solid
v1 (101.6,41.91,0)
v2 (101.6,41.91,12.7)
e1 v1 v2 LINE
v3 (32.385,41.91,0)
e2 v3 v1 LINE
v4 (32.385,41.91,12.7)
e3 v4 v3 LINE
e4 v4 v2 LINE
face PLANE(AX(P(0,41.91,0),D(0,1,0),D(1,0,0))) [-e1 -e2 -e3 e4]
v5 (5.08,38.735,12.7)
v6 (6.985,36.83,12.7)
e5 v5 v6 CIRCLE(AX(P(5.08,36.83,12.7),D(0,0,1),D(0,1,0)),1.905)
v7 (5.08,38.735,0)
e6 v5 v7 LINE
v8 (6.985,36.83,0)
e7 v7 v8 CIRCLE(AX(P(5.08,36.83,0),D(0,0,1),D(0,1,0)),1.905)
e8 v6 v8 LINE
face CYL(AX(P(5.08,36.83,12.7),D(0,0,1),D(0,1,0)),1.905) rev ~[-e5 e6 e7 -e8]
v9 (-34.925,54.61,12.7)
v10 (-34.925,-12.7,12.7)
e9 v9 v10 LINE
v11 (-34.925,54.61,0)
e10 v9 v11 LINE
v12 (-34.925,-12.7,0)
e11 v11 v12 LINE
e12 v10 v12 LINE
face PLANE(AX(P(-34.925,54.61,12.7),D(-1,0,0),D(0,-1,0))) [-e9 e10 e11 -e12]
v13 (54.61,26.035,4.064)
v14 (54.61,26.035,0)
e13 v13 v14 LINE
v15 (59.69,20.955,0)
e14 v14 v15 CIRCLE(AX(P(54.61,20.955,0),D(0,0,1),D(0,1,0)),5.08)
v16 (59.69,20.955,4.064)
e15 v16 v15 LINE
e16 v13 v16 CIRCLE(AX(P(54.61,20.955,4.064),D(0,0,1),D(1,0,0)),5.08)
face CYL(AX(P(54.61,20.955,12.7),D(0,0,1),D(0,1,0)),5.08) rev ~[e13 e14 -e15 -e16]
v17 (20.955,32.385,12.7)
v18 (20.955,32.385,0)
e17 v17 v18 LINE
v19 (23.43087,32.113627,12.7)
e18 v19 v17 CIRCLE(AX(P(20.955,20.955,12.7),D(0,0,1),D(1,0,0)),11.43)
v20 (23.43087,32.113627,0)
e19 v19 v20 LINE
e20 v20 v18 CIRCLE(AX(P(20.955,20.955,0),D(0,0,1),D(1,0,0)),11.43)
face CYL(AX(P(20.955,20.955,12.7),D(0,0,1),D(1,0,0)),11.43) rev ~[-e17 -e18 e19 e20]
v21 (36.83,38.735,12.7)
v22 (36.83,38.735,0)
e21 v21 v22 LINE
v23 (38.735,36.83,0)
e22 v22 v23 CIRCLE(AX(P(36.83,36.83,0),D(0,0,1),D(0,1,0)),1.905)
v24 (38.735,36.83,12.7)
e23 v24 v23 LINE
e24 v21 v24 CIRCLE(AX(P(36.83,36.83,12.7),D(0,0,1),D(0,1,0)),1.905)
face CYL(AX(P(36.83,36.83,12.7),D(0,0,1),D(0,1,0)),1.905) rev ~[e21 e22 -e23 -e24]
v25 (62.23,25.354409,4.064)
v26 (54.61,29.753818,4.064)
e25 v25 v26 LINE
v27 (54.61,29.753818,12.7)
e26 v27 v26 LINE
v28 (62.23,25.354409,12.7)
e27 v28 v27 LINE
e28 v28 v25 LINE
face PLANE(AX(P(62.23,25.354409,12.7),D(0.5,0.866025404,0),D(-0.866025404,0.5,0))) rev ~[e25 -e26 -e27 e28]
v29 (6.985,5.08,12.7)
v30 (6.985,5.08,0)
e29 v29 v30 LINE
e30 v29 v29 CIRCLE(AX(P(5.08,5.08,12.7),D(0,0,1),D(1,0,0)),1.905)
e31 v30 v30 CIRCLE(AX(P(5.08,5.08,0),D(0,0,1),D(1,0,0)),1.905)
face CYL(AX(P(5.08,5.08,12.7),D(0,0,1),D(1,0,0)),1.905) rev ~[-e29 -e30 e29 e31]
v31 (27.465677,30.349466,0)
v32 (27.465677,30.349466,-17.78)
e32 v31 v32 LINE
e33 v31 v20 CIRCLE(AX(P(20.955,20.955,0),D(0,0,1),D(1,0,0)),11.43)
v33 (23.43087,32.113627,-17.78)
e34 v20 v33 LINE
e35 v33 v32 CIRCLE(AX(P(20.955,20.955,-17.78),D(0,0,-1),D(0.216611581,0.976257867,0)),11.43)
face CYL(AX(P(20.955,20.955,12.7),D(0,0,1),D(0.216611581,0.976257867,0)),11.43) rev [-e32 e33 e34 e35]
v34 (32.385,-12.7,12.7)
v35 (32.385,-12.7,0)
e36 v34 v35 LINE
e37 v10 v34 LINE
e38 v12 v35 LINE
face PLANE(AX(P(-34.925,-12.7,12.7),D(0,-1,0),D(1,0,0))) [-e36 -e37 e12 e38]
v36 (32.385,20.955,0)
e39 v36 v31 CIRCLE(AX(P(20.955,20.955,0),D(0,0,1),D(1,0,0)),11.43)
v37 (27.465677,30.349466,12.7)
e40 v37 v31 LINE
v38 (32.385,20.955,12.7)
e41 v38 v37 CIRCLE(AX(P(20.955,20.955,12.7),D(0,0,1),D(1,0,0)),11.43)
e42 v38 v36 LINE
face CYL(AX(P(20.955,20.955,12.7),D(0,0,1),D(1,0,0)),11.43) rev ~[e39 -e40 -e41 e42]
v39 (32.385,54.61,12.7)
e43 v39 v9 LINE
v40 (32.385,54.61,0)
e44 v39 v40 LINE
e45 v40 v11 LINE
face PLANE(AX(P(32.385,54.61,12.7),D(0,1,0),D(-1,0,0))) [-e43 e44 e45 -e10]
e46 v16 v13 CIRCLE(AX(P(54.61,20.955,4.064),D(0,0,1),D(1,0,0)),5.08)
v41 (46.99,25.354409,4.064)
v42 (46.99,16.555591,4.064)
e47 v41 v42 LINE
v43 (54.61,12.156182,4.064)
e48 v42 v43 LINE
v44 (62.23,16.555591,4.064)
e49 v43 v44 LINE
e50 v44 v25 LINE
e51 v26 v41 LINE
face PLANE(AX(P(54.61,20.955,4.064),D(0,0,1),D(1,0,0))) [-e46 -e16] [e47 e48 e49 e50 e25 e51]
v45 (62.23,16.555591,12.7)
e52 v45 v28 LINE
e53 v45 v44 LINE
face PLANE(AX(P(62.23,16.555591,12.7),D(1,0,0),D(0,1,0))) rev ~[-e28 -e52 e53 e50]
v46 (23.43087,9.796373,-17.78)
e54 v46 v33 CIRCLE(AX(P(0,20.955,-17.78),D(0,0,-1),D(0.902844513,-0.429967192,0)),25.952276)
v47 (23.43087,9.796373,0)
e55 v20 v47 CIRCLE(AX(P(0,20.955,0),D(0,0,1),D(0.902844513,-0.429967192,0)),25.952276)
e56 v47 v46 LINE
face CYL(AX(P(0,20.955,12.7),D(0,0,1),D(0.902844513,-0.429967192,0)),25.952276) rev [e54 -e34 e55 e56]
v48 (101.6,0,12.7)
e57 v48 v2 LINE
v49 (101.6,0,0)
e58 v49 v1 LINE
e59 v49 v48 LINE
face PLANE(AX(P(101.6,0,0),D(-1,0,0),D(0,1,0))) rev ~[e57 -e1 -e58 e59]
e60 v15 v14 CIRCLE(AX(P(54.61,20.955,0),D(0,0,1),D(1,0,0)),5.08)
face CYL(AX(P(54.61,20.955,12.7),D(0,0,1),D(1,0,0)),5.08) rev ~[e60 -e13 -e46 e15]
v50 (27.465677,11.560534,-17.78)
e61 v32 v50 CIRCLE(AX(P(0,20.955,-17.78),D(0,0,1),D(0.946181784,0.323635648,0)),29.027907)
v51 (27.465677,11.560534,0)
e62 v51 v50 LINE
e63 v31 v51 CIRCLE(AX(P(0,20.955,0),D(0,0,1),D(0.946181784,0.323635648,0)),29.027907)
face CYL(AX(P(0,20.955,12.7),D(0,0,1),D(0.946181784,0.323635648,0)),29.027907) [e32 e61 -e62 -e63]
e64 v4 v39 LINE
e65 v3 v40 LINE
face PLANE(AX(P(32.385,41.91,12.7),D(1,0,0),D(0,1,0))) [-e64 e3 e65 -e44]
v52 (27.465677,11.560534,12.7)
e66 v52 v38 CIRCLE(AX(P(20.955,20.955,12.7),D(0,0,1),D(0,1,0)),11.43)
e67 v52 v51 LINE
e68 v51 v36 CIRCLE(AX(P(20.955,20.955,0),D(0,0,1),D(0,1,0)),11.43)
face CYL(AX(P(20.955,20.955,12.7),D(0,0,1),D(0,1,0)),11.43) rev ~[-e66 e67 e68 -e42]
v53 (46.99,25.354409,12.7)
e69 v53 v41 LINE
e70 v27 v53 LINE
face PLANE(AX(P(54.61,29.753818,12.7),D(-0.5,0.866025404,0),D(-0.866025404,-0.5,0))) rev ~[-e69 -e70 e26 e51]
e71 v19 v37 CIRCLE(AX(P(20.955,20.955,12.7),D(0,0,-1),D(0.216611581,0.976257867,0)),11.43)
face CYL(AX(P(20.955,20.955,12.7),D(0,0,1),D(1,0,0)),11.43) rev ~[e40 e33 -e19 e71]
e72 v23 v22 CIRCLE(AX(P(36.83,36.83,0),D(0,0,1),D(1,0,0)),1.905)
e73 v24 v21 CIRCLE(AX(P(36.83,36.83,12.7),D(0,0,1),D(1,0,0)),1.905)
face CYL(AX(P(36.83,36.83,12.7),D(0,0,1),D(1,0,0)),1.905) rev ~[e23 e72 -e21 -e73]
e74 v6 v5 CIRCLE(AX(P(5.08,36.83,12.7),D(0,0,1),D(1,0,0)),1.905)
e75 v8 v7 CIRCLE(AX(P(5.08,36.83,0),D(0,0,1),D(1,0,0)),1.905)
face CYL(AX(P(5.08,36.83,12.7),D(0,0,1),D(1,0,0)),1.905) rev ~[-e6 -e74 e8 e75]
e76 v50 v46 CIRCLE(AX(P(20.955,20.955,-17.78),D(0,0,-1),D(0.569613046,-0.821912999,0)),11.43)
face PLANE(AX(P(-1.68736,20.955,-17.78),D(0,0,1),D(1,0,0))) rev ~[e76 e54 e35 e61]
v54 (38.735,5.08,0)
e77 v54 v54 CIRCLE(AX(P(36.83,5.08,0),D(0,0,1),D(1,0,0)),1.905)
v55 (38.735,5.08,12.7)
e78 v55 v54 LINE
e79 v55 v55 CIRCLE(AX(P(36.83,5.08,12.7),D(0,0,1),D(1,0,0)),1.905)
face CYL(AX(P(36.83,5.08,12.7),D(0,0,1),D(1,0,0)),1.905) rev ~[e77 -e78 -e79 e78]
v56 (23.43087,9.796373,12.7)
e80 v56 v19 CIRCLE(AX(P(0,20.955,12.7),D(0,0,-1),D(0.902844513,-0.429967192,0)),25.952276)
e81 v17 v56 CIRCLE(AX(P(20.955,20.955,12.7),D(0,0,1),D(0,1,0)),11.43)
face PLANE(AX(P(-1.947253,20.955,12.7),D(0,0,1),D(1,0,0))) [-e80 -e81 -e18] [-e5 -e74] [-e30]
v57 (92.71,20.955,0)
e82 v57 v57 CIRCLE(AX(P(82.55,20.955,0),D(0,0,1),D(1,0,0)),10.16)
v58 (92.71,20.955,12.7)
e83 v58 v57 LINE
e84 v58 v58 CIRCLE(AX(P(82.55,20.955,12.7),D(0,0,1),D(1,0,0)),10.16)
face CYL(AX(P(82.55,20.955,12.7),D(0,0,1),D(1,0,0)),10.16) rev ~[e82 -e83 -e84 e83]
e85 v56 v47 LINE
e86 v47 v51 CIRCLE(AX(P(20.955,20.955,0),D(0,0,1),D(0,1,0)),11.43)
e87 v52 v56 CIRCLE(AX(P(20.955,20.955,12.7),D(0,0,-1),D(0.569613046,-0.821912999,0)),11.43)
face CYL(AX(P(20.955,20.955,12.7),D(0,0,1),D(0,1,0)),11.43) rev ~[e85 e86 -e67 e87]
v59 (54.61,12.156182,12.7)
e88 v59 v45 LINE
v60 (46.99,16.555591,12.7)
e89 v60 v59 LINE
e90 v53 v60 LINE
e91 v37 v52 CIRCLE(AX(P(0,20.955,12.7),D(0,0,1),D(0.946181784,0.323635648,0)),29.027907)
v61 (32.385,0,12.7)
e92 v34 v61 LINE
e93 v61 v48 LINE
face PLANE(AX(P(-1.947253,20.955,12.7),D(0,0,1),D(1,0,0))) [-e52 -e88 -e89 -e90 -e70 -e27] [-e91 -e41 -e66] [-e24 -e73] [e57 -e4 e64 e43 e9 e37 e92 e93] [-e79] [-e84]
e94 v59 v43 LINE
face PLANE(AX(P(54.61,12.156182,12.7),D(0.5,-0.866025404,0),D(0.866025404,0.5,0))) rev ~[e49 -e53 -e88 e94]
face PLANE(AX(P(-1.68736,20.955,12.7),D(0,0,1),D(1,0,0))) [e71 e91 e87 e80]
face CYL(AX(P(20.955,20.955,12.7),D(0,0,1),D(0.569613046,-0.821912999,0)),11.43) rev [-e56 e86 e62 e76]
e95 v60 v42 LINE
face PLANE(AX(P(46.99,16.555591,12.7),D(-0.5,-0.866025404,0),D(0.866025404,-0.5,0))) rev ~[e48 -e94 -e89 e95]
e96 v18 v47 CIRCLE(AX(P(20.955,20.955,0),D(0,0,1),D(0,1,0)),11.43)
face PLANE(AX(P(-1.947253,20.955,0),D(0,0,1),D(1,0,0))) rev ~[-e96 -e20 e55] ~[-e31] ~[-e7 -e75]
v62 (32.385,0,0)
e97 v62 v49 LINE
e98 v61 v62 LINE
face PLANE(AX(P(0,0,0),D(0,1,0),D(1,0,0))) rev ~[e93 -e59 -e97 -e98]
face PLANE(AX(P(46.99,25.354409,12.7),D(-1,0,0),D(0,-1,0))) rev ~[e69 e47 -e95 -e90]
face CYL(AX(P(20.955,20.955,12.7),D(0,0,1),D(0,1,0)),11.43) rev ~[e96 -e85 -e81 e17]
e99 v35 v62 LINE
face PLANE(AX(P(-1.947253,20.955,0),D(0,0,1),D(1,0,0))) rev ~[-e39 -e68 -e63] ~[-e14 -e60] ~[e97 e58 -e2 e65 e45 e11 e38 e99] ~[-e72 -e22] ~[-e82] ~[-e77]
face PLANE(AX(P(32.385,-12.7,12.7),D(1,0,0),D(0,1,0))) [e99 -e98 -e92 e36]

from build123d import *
from build123d import SkipClean  # not in build123d's __all__

# Parameters (mm, degrees)
F0_W      = 101.6
F0_H      = 41.91
F1_DEPTH  = 12.7
F4_DEPTH  = 12.701
F5_R      = 5.08
F6_DEPTH  = 8.636
F7_R      = 10.16
F8_DEPTH  = 12.701
F10_DEPTH = 12.701
F2_R      = 1.905
F12_DEPTH = 25.4
F13_DEPTH = 12.7
F15_DEPTH = 30.48


with BuildPart() as f1:
    # F0 (on Top) → F1 (new body)
    with BuildSketch(Plane.XY):
        with Locations((50.8, 20.955)):
            Rectangle(F0_W, F0_H)
    extrude(amount=F1_DEPTH)

    # F3 (on face) → F4 (cut, through all)
    with BuildSketch(Plane.XY.offset(12.7)):
        with BuildLine():
            ThreePointArc((59.69, 20.955), (58.2021024484, 24.5471024484), (54.61, 26.035))
            ThreePointArc((54.61, 26.035), (51.0178975516, 17.3628975516), (59.69, 20.955))
        make_face()
    extrude(amount=-F4_DEPTH, mode=Mode.SUBTRACT)

    # F5 (on face) → F6 (cut)
    with BuildSketch(Plane.XY.offset(12.7)):
        Polygon((62.23, 16.5555909488), (62.23, 20.955), (62.23, 25.3544090512), (54.61, 29.7538181024), (46.99, 25.3544090512), (46.99, 16.5555909488), (54.61, 12.1561818976), align=None)
        with Locations((54.61, 20.955)):
            Circle(F5_R, mode=Mode.SUBTRACT)
    extrude(amount=-F6_DEPTH, mode=Mode.SUBTRACT)

    # F7 (on face) → F8 (cut, through all)
    with BuildSketch(Plane.XY.offset(12.7)):
        with Locations((82.55, 20.955)):
            Circle(F7_R)
    extrude(amount=-F8_DEPTH, mode=Mode.SUBTRACT)

    # F9 (on face) → F10 (cut, through all)
    with BuildSketch(Plane.XY.offset(12.7)):
        with BuildLine():
            ThreePointArc((20.955, 32.385), (12.872769491, 12.872769491), (32.385, 20.955))
            ThreePointArc((32.385, 20.955), (29.037230509, 29.037230509), (20.955, 32.385))
        make_face()
    extrude(amount=-F10_DEPTH, mode=Mode.SUBTRACT)

    # F2 (on face) → F12 (cut)
    with BuildSketch(Plane.XY.offset(12.7)):
        with BuildLine():
            ThreePointArc((38.735, 36.83), (38.1770384182, 38.1770384182), (36.83, 38.735))
            ThreePointArc((36.83, 38.735), (35.4829615818, 35.4829615818), (38.735, 36.83))
        make_face()
        with Locations((5.08, 5.08)):
            Circle(F2_R)
        with BuildLine():
            ThreePointArc((6.985, 36.83), (6.4270384182, 38.1770384182), (5.08, 38.735))
            ThreePointArc((5.08, 38.735), (3.7329615818, 35.4829615818), (6.985, 36.83))
        make_face()
        with Locations((36.83, 5.08)):
            Circle(F2_R)
    extrude(amount=-F12_DEPTH, mode=Mode.SUBTRACT)

    # F11 (on face) → F13 (join)
    with BuildSketch(Plane.XY.offset(12.7)):
        Polygon((32.385, -12.7), (32.385, 0), (0, 0), (0, 41.91), (32.385, 41.91), (32.385, 54.61), (-34.925, 54.61), (-34.925, -12.7), align=None)
    extrude(amount=-F13_DEPTH)

    # F14 (on face) → F15 (join)
    with BuildSketch(Plane.XY.offset(12.7)):
        with BuildLine():
            ThreePointArc((23.4308703665, 32.1136274213), (25.5340365405, 31.4276942265), (27.4656771106, 30.3494655815))
            ThreePointArc((27.4656771106, 30.3494655815), (-29.0279073084, 20.955), (27.4656771106, 11.5605344185))
            ThreePointArc((27.4656771106, 11.5605344185), (25.5340365405, 10.4823057735), (23.4308703665, 9.7963725787))
            ThreePointArc((23.4308703665, 9.7963725787), (-25.9522764331, 20.955), (23.4308703665, 32.1136274213))
        make_face()
    with SkipClean():  # cleaning this boolean's faces spoils the solid; the shape is the same uncleaned
        extrude(amount=-F15_DEPTH)


solid = f1.part
